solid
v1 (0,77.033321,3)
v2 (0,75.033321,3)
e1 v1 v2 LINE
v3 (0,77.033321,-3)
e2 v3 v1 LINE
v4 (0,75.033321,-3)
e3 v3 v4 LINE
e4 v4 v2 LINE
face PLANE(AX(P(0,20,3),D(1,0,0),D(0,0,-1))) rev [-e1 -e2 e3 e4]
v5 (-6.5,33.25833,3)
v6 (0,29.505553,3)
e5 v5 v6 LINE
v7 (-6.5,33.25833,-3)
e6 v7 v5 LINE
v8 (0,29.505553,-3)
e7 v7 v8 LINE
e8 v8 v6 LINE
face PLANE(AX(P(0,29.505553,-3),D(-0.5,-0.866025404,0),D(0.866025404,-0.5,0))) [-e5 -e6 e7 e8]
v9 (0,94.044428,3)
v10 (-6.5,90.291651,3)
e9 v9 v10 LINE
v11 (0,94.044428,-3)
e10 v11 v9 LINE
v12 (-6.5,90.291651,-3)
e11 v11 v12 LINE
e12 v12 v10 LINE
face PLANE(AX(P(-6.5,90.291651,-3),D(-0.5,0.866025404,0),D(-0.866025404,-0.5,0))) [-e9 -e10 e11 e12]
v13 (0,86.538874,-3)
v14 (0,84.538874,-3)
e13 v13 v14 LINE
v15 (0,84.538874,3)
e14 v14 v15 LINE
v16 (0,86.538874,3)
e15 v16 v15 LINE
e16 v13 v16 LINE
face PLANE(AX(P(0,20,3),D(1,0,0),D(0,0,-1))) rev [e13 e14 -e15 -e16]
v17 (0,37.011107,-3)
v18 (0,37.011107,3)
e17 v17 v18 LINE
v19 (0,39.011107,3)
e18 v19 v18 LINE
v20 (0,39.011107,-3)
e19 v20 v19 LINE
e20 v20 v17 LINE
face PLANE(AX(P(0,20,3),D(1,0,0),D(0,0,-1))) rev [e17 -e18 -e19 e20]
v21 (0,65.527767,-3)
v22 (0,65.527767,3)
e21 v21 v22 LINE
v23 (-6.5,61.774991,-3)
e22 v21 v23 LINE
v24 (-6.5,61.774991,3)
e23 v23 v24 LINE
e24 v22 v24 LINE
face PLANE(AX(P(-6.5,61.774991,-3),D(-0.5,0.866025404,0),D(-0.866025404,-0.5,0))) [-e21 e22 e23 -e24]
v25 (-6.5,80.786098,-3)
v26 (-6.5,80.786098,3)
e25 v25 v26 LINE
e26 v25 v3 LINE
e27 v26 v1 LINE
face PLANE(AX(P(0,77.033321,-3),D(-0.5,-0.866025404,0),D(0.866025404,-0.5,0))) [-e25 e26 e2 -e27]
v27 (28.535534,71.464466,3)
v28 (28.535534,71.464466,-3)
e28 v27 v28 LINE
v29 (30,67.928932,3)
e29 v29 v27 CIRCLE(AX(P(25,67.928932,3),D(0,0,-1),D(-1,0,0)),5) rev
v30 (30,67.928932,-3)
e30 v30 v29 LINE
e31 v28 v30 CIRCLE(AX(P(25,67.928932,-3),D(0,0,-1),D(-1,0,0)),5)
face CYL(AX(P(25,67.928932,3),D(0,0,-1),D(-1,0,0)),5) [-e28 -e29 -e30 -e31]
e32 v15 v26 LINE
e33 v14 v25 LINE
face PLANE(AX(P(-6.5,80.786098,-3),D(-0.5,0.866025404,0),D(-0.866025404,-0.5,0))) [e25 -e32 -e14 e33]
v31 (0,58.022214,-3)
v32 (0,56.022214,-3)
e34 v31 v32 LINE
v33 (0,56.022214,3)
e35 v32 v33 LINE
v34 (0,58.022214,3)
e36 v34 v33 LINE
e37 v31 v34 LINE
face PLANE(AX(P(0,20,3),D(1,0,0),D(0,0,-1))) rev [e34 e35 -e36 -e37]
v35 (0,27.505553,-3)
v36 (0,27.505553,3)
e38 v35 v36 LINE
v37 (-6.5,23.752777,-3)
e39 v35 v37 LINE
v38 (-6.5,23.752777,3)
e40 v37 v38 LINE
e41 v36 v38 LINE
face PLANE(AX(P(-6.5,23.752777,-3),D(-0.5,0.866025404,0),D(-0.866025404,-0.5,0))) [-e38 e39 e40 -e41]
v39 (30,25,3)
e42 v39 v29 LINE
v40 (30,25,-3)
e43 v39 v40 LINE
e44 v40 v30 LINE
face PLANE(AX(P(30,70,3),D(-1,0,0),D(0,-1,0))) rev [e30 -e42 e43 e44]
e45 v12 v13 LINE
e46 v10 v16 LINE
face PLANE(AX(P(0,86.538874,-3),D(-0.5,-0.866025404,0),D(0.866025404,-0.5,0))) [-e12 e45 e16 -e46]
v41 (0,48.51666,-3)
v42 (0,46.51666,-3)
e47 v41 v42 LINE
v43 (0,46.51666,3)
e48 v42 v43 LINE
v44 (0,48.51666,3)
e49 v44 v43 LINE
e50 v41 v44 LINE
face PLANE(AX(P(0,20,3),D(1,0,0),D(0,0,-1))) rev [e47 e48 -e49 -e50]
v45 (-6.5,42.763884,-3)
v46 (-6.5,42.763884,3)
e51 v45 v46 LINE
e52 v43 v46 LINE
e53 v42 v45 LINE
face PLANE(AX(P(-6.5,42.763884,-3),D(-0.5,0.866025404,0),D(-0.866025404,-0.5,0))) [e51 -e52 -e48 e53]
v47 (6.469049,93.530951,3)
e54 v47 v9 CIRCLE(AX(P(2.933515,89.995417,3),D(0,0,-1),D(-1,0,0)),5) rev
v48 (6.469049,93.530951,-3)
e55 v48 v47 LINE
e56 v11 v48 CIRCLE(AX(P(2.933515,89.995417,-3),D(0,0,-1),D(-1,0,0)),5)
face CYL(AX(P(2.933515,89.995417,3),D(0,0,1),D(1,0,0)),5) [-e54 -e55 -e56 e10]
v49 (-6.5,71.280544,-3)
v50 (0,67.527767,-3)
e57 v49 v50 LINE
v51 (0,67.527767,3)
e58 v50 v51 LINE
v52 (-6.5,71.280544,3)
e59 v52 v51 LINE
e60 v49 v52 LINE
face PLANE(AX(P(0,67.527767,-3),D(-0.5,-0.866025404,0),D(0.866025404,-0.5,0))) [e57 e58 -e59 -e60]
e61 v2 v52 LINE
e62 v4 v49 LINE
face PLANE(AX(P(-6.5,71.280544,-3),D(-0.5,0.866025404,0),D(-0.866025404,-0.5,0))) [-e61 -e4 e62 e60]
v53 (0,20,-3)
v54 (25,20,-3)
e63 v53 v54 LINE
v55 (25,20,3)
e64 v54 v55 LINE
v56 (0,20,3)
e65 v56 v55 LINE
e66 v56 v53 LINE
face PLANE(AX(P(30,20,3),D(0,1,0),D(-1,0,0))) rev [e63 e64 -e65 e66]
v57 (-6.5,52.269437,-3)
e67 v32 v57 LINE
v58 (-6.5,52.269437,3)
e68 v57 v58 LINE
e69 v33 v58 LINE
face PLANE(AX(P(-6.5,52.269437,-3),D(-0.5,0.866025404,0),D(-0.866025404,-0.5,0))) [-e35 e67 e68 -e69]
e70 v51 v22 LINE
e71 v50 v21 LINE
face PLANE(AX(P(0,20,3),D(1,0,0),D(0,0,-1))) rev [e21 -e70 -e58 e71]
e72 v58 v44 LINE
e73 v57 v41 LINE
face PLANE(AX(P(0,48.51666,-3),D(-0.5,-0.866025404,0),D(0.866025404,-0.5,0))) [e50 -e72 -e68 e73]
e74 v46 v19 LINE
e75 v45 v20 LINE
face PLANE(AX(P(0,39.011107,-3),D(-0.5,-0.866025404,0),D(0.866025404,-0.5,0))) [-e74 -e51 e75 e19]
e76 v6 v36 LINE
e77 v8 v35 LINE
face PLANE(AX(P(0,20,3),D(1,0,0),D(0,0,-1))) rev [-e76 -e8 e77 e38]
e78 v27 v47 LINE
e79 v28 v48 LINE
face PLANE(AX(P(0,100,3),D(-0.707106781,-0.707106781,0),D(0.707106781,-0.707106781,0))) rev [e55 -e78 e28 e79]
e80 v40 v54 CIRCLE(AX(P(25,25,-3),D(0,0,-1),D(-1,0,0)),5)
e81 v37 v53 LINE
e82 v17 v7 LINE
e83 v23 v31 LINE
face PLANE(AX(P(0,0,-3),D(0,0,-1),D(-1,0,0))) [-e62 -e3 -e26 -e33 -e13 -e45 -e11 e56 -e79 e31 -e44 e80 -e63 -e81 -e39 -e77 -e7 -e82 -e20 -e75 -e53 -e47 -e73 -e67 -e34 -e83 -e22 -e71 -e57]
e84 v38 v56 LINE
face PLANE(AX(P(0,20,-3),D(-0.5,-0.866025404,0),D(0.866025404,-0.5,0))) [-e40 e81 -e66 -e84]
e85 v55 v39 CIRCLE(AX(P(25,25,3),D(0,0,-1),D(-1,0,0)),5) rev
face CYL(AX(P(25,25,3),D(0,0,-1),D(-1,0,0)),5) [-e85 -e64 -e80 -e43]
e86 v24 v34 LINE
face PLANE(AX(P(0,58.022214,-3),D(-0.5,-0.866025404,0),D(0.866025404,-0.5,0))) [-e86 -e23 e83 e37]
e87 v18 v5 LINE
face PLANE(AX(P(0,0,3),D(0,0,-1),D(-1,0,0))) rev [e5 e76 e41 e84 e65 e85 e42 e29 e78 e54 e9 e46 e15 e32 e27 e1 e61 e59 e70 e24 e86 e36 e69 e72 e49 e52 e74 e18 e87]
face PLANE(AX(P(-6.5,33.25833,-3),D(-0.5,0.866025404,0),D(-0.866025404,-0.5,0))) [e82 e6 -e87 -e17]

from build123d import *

# Parameters (mm, degrees)
SALIENTE_EXTRUIR1_DEPTH = 3
SALIENTE_EXTRUIR3_DEPTH = 6
REDONDEO1_R             = 5


with BuildPart() as part:
    # Croquis1 → Saliente-Extruir1 (new, symmetric)
    with BuildSketch(Plane.XY):
        Polygon((0, 20), (0, 100), (30, 70), (30, 20), align=None)
    extrude(amount=SALIENTE_EXTRUIR1_DEPTH, both=True)

    # Croquis4 → Saliente-Extruir3 (add, through all)
    with BuildSketch(Plane.XY.offset(3)):
        Polygon((0, 20), (-6.5, 23.75277675), (0, 27.505553499), align=None)
        Polygon((0, 37.011106999), (0, 29.505553499), (-6.5, 33.258330249), align=None)
        Polygon((0, 46.516660498), (0, 39.011106999), (-6.5, 42.763883749), align=None)
        Polygon((0, 56.022213998), (0, 48.516660498), (-6.5, 52.269437248), align=None)
        Polygon((0, 65.527767497), (0, 58.022213998), (-6.5, 61.774990748), align=None)
        Polygon((0, 75.033320997), (0, 67.527767497), (-6.5, 71.280544247), align=None)
        Polygon((0, 84.538874496), (0, 77.033320997), (-6.5, 80.786097747), align=None)
        Polygon((0, 94.044427996), (0, 86.538874496), (-6.5, 90.291651246), align=None)
    extrude(amount=-SALIENTE_EXTRUIR3_DEPTH)

    # Redondeo1
    # the kernel refuses this fillet: 5 mm, written as the material it takes off along each edge
    with BuildSketch(Plane(origin=(0, 100, 25.871542056), x_dir=(0, -1, 0), z_dir=(0, 0, -1))) as redondeo1_piece_1:
        with BuildLine():
            CenterArc((10.0045829, -2.933515088), REDONDEO1_R, 144.076608278, 80.923391722)
            Line((6.469048994, -6.469048994), (6.398338316, -6.539759672))
            Line((6.398338316, -6.539759672), (-0.070710678, -0.070710678))
            Line((-0.070710678, -0.070710678), (0, 0.1))
            ThreePointArc((0, 0.1), (2.977786002, 0.1), (5.874591786, 0.058670302))
            Line((5.874591786, 0.058670302), (5.955572004, 0))
        make_face()
    extrude(amount=51.743084112, mode=Mode.SUBTRACT)
    with BuildSketch(Plane(origin=(30, 20, -15.5), x_dir=(0, 1, 0), z_dir=(0, 0, 1))) as redondeo1_piece_2:
        with BuildLine():
            CenterArc((REDONDEO1_R, REDONDEO1_R), REDONDEO1_R, 180, 90)
            Line((0, REDONDEO1_R), (-REDONDEO1_R * 0.02, REDONDEO1_R))
            Line((-REDONDEO1_R * 0.02, REDONDEO1_R), (-REDONDEO1_R * 0.02, -REDONDEO1_R * 0.02))
            Line((-REDONDEO1_R * 0.02, -REDONDEO1_R * 0.02), (REDONDEO1_R, -REDONDEO1_R * 0.02))
            Line((REDONDEO1_R, -REDONDEO1_R * 0.02), (REDONDEO1_R, 0))
        make_face()
    extrude(amount=31, mode=Mode.SUBTRACT)
    with BuildSketch(Plane(origin=(30, 70, 8.17766953), x_dir=(-0.7071067811865449, 0.70710678118655, 0), z_dir=(0, 0, -1))) as redondeo1_piece_3:
        with BuildLine():
            CenterArc((REDONDEO1_R * 0.414213562373, -REDONDEO1_R), REDONDEO1_R, 90, 45)
            Line((-REDONDEO1_R * 0.292893218813, -REDONDEO1_R * 0.292893218813), (-REDONDEO1_R * 0.307035354437, -REDONDEO1_R * 0.27875108319))
            Line((-REDONDEO1_R * 0.307035354437, -REDONDEO1_R * 0.27875108319), (-REDONDEO1_R * 0.00828427124746, REDONDEO1_R * 0.02))
            Line((-REDONDEO1_R * 0.00828427124746, REDONDEO1_R * 0.02), (REDONDEO1_R * 0.414213562373, REDONDEO1_R * 0.02))
            Line((REDONDEO1_R * 0.414213562373, REDONDEO1_R * 0.02), (REDONDEO1_R * 0.414213562373, 0))
        make_face()
    extrude(amount=16.355339059, mode=Mode.SUBTRACT)


solid = part.part
